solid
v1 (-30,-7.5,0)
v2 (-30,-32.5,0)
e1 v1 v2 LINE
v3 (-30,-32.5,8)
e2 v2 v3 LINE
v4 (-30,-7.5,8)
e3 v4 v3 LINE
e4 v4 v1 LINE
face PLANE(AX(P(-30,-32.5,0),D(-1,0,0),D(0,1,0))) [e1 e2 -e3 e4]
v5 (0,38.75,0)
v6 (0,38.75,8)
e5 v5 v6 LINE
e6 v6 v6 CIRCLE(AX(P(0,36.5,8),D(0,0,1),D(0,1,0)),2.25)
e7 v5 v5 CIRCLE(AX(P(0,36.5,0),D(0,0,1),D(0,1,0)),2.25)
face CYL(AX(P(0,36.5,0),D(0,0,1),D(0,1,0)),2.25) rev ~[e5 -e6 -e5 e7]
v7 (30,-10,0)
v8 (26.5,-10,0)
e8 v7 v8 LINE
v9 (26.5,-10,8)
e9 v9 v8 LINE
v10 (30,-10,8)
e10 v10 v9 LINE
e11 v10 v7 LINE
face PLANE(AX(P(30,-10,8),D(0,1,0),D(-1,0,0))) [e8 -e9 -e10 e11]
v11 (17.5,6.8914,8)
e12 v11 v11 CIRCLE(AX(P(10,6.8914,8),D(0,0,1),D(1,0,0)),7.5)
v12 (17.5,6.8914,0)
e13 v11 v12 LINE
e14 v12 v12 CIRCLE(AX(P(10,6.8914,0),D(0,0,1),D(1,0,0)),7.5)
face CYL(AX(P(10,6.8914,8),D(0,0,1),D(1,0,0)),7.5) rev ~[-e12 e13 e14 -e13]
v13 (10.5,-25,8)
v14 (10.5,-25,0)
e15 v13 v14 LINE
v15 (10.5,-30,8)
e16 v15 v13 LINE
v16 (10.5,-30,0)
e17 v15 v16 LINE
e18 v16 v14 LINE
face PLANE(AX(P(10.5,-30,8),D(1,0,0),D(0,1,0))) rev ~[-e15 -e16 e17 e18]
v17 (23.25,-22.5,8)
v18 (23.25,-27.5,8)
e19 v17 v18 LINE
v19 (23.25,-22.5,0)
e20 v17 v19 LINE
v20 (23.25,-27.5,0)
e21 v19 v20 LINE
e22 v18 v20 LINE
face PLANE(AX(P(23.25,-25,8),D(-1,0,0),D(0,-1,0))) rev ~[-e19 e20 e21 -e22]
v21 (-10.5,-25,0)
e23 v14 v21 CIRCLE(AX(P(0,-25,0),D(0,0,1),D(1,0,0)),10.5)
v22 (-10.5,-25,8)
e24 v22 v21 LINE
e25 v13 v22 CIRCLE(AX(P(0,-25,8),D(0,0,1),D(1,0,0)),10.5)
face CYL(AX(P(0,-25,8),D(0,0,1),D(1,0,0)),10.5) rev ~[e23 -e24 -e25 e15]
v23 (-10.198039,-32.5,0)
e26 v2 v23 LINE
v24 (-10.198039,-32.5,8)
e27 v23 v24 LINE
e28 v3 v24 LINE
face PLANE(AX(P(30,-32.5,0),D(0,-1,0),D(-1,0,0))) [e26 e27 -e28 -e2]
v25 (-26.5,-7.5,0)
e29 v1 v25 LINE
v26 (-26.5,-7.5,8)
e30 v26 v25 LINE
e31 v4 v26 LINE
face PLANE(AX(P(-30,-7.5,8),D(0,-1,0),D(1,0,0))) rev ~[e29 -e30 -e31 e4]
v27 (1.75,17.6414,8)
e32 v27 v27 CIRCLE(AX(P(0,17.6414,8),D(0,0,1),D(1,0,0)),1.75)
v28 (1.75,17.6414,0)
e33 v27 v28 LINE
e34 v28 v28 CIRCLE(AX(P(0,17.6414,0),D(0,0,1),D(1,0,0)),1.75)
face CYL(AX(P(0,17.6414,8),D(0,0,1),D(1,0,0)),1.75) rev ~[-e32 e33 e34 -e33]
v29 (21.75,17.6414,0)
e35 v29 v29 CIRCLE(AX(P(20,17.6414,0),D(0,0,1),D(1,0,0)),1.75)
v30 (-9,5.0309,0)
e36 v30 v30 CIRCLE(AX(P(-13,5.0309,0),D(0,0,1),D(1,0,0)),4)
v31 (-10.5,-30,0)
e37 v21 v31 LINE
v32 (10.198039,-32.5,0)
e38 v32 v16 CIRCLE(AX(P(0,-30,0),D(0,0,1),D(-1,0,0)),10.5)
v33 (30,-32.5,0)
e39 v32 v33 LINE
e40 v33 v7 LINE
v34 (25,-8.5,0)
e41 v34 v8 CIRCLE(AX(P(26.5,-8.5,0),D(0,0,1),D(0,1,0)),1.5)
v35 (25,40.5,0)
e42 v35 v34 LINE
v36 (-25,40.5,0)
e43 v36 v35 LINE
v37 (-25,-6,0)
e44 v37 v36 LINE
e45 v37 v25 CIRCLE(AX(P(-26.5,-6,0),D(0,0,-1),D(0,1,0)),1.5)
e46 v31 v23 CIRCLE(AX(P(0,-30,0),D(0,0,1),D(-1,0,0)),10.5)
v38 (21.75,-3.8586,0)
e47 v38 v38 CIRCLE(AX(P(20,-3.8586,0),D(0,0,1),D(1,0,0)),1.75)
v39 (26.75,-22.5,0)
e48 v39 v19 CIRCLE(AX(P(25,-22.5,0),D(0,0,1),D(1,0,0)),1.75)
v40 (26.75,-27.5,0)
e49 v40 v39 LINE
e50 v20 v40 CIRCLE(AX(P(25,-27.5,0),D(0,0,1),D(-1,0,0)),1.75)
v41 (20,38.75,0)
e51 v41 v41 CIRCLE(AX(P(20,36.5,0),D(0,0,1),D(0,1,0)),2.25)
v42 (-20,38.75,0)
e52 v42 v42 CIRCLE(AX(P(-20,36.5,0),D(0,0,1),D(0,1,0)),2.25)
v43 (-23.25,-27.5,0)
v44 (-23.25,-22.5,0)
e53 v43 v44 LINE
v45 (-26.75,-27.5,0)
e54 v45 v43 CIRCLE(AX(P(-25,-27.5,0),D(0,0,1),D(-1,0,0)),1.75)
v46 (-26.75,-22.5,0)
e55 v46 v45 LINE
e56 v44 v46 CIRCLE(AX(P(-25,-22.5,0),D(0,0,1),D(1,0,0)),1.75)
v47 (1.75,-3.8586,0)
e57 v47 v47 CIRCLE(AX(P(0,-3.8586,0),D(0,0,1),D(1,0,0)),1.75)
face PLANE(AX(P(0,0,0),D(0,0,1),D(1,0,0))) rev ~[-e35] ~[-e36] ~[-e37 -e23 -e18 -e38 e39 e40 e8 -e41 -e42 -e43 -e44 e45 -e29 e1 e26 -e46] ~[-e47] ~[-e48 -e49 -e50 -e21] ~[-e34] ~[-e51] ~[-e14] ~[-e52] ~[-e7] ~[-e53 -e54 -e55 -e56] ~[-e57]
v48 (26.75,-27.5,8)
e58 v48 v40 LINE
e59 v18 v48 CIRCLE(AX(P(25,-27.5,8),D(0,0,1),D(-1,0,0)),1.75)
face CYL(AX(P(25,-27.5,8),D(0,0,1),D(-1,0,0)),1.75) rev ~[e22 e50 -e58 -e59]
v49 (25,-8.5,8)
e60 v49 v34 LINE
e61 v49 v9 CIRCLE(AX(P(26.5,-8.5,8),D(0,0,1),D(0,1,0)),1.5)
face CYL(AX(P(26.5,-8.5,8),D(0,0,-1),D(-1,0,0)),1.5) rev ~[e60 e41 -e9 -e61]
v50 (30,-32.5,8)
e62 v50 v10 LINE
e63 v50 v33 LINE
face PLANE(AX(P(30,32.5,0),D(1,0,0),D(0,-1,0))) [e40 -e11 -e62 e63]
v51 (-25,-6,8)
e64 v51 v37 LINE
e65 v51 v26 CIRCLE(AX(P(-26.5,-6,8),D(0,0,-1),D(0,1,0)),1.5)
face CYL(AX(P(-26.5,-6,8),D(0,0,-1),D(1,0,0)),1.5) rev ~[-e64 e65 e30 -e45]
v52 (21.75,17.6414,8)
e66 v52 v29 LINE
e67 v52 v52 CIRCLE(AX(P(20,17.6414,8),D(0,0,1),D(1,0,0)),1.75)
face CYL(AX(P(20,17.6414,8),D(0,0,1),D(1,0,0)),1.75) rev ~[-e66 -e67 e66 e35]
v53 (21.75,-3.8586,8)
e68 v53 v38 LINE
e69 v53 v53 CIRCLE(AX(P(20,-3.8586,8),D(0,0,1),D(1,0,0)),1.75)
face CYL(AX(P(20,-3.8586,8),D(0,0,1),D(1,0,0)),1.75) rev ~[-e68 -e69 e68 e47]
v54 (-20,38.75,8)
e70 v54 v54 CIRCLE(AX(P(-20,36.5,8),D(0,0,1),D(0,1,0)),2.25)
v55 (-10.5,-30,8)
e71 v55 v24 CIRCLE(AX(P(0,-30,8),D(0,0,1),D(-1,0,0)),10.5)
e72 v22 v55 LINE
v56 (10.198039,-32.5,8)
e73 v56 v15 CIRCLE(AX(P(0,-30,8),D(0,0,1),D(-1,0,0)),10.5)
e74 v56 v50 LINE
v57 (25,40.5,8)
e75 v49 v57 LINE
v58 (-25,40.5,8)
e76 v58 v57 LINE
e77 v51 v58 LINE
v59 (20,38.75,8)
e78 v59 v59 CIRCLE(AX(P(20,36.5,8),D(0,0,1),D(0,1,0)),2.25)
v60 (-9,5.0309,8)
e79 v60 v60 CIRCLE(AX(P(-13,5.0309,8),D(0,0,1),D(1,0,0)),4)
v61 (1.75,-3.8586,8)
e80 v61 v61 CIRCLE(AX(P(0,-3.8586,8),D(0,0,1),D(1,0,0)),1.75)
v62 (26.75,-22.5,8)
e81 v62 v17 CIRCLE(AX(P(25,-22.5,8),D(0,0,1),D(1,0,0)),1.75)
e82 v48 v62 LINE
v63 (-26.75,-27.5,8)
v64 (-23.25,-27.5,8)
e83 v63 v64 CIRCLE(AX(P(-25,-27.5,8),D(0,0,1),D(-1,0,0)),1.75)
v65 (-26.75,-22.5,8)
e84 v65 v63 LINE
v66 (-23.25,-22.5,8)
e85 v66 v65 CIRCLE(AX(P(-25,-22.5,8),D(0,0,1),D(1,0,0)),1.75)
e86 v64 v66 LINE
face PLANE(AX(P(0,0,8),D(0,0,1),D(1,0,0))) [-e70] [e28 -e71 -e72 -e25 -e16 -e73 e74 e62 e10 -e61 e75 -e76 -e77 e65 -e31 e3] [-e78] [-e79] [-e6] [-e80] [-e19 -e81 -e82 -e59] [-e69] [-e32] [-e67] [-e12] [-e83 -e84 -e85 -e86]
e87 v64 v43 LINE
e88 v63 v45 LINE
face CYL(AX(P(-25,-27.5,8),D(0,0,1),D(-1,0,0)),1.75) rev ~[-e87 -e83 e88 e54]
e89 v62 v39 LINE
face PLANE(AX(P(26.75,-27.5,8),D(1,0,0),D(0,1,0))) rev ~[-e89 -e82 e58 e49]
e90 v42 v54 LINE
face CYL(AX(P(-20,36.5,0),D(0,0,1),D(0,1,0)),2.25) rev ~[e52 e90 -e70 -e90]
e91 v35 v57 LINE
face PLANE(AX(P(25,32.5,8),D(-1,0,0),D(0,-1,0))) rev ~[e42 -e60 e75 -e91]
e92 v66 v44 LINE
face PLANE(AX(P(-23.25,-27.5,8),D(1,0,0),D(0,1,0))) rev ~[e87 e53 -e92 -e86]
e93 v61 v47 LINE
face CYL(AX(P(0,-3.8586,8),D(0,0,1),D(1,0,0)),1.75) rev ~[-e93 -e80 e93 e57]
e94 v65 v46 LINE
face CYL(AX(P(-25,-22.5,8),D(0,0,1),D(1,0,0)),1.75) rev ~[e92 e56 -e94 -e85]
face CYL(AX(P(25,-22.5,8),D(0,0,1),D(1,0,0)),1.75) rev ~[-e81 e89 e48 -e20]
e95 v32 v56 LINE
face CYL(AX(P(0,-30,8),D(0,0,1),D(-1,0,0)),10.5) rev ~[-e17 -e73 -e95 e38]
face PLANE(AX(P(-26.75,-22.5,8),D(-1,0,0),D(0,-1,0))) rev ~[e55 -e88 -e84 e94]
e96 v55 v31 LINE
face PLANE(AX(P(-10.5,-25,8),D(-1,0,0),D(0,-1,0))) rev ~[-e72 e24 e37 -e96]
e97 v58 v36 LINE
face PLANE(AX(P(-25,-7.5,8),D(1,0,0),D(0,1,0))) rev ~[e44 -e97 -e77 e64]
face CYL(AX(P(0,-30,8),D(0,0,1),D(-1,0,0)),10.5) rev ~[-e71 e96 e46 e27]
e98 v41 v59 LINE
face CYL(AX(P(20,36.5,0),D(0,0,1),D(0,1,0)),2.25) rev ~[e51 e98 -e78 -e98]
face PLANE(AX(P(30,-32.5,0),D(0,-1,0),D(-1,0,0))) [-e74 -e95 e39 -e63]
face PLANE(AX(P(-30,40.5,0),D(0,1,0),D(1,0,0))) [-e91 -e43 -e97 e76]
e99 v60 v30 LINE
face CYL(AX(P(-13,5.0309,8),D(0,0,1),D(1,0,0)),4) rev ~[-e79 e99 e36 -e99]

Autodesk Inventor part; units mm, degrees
ref_plane "YZ Plane" through (0, 0, 0) normal (1, 0, 0) x (0, 1, 0)
ref_plane "XZ Plane" through (0, 0, 0) normal (0, 1, 0) x (-1, 0, 0)
ref_plane "XY Plane" through (0, 0, 0) normal (0, 0, 1) x (1, 0, 0)
sketch "Sketch1" plane through (0, 0, 0) normal (0, 0, 1) x (1, 0, 0)
  line L0 (-30, 32.5) -> (30, 32.5)
  line L1 (30, 32.5) -> (30, -32.5)
  line L2 (30, -32.5) -> (-30, -32.5)
  line L3 (-30, -32.5) -> (-30, 32.5)
  point P0 (0, 0)
  point P1 (0, 32.5)
  point P2 (-30, 0)
  dimension "d0" = 60
  dimension "d1" = 65
extrude "Extrusion1" add sketch "Sketch1" along normal blind 8
sketch "Sketch4" plane through (0, 0, 8) normal (0, 0, 1) x (1, 0, 0)
  circle A0 centre (-25, -15) radius 1.75
  circle A1 centre (25, -15) radius 1.75
  circle A2 centre (25, -25) radius 1.75
  arc A3 (-10.5, -30) -> (10.5, -30) centre (0, -30) ccw
  line L0 (10.5, -30) -> (10.5, -25)
  arc A4 (10.5, -25) -> (-10.5, -25) centre (0, -25) ccw
  line L1 (-10.5, -25) -> (-10.5, -30)
  line L2 (30, -10) -> (30, -50)
  line L3 (30, -50) -> (-30, -50)
  line L4 (-30, -50) -> (-30, -10)
  line L5 (-30, -10) -> (30, -10)
  line L6 (25, -27.5) -> (25, -22.5) construction
  line L7 (26.75, -27.5) -> (26.75, -22.5)
  line L8 (23.25, -22.5) -> (23.25, -27.5)
  arc A5 (23.25, -27.5) -> (26.75, -27.5) centre (25, -27.5) ccw
  arc A6 (26.75, -22.5) -> (23.25, -22.5) centre (25, -22.5) ccw
  line L9 (-25, -27.5) -> (-25, -22.5) construction
  line L10 (-23.25, -27.5) -> (-23.25, -22.5)
  line L11 (-26.75, -22.5) -> (-26.75, -27.5)
  arc A7 (-26.75, -27.5) -> (-23.25, -27.5) centre (-25, -27.5) ccw
  arc A8 (-23.25, -22.5) -> (-26.75, -22.5) centre (-25, -22.5) ccw
  line L12 (-30, -32.5) -> (30, -32.5) projected
  point P0 (0, 0)
  point P1 (-25, -25)
  point P2 (26.75, -25)
  point P3 (23.25, -25)
  dimension "d22" = 5
  dimension "d23" = 3.5
  dimension "d24" = 5
  dimension "d25" = 10.5
  dimension "d26" = 7.5
  dimension "d27" = 30
extrude "Extrusion4" cut sketch "Sketch4" against normal blind 10 contours A2 | L7 A5 L8 A2 | A2 L8 A6 L7 | L1 A4 L0 A3 L12 | L12 A3 | A7 L11 A8 L10
sketch "Sketch5" plane through (0, 0, 8) normal (0, 0, 1) x (1, 0, 0)
  circle A0 centre (10, 6.8914) radius 7.5
  line L0 (30, 32.5) -> (-30, 32.5) projected
  line L1 (30, -32.5) -> (30, 32.5) projected
  point P0 (0, 0)
  dimension "d13" = 15
  dimension "d28" = 25.6086
  dimension "d29" = 20
extrude "Extrusion5" cut sketch "Sketch5" against normal through all
sketch "Sketch6" plane through (0, 0, 8) normal (0, 0, 1) x (1, 0, 0)
  circle A0 centre (20, 17.6414) radius 1.75
  circle A1 centre (0, 17.6414) radius 1.75
  circle A2 centre (0, -3.8586) radius 1.75
  circle A3 centre (20, -3.8586) radius 1.75
  line L0 (0, 17.6414) -> (20, 17.6414) construction
  line L1 (20, 17.6414) -> (20, -3.8586) construction
  line L2 (20, -3.8586) -> (0, -3.8586) construction
  line L3 (0, -3.8586) -> (0, 17.6414) construction
  line L4 (30, -32.5) -> (30, 32.5) construction
  line L5 (30, 32.5) -> (-30, 32.5) construction
  circle A4 centre (10, 6.8914) radius 7.5 projected
  point P0 (0, 0)
  point P1 (10, -3.8586)
  point P2 (20, 6.8914)
  dimension "d31" = 21.5
  dimension "d33" = 3.5
  dimension "d42" = 20
extrude "Extrusion6" cut sketch "Sketch6" against normal through all contours A0 | A1 | A2 | A3
sketch "Sketch7" plane through (0, 0, 8) normal (0, 0, 1) x (1, 0, 0)
  line L0 (-30, 32.5) -> (-30, -32.5) projected
  line L1 (-30, -7.5) -> (-25, -7.5)
  line L2 (-25, -7.5) -> (-25, 32.5)
  line L3 (-25, 32.5) -> (-30, 32.5)
  line L4 (-30, 32.5) -> (-30, -7.5)
  line L5 (30, 32.5) -> (-30, 32.5) projected
  line L6 (30, -10) -> (-30, -10) projected
  line L7 (25, -10) -> (30, -10)
  line L8 (30, -10) -> (30, 32.5)
  line L9 (30, 32.5) -> (25, 32.5)
  line L10 (25, 32.5) -> (25, -10)
  line L11 (30, -32.5) -> (30, 32.5) projected
  point P0 (0, 0)
  point P1 (25, -10)
  dimension "d18" = 5
  dimension "d19" = 5
  dimension "d43" = 40
extrude "Extrusion7" cut sketch "Sketch7" against normal through all contours L3 L2 L1 L0 | L5 L8 L6 L10
sketch "Sketch8" plane through (0, 0, 8) normal (0, 0, 1) x (1, 0, 0)
  circle A0 centre (-13, 5.0309) radius 4
  line L0 (-30, -7.5) -> (-30, -32.5) projected
  line L1 (25, 32.5) -> (-25, 32.5) projected
  point P0 (0, 0)
  dimension "d35" = 8
  dimension "d36" = 17
  dimension "d37" = 27.4691
extrude "Extrusion8" cut sketch "Sketch8" against normal blind 10
move faces "Move1" translate (0, 8, 0) faces at (8.3333, 32.5, 2.6667)
sketch "Sketch9" plane through (0, 0, 0) normal (0, 0, -1) x (-1, 0, 0)
  line L0 (-25, 40.5) -> (25, 40.5) projected
  point P0 (0, 0)
  point P1 (0, 36.5)
  point P2 (-20, 36.5)
  point P3 (20, 36.5)
  dimension "d47" = 20
  dimension "d48" = 20
  dimension "d49" = 4
hole "Hole1" at (0, 36.5, 0) at (20, 36.5, 0) at (-20, 36.5, 0) direction (0, 0, 1) diameter 4.5 end through all
fillet "Fillet1" radius 1.5 2 edges at (25, -10, 4) (-25, -7.5, 4)
equation "\"d19\" = d18"
equation "\"d48\" = d47"
properties part number "0005-10-005"
